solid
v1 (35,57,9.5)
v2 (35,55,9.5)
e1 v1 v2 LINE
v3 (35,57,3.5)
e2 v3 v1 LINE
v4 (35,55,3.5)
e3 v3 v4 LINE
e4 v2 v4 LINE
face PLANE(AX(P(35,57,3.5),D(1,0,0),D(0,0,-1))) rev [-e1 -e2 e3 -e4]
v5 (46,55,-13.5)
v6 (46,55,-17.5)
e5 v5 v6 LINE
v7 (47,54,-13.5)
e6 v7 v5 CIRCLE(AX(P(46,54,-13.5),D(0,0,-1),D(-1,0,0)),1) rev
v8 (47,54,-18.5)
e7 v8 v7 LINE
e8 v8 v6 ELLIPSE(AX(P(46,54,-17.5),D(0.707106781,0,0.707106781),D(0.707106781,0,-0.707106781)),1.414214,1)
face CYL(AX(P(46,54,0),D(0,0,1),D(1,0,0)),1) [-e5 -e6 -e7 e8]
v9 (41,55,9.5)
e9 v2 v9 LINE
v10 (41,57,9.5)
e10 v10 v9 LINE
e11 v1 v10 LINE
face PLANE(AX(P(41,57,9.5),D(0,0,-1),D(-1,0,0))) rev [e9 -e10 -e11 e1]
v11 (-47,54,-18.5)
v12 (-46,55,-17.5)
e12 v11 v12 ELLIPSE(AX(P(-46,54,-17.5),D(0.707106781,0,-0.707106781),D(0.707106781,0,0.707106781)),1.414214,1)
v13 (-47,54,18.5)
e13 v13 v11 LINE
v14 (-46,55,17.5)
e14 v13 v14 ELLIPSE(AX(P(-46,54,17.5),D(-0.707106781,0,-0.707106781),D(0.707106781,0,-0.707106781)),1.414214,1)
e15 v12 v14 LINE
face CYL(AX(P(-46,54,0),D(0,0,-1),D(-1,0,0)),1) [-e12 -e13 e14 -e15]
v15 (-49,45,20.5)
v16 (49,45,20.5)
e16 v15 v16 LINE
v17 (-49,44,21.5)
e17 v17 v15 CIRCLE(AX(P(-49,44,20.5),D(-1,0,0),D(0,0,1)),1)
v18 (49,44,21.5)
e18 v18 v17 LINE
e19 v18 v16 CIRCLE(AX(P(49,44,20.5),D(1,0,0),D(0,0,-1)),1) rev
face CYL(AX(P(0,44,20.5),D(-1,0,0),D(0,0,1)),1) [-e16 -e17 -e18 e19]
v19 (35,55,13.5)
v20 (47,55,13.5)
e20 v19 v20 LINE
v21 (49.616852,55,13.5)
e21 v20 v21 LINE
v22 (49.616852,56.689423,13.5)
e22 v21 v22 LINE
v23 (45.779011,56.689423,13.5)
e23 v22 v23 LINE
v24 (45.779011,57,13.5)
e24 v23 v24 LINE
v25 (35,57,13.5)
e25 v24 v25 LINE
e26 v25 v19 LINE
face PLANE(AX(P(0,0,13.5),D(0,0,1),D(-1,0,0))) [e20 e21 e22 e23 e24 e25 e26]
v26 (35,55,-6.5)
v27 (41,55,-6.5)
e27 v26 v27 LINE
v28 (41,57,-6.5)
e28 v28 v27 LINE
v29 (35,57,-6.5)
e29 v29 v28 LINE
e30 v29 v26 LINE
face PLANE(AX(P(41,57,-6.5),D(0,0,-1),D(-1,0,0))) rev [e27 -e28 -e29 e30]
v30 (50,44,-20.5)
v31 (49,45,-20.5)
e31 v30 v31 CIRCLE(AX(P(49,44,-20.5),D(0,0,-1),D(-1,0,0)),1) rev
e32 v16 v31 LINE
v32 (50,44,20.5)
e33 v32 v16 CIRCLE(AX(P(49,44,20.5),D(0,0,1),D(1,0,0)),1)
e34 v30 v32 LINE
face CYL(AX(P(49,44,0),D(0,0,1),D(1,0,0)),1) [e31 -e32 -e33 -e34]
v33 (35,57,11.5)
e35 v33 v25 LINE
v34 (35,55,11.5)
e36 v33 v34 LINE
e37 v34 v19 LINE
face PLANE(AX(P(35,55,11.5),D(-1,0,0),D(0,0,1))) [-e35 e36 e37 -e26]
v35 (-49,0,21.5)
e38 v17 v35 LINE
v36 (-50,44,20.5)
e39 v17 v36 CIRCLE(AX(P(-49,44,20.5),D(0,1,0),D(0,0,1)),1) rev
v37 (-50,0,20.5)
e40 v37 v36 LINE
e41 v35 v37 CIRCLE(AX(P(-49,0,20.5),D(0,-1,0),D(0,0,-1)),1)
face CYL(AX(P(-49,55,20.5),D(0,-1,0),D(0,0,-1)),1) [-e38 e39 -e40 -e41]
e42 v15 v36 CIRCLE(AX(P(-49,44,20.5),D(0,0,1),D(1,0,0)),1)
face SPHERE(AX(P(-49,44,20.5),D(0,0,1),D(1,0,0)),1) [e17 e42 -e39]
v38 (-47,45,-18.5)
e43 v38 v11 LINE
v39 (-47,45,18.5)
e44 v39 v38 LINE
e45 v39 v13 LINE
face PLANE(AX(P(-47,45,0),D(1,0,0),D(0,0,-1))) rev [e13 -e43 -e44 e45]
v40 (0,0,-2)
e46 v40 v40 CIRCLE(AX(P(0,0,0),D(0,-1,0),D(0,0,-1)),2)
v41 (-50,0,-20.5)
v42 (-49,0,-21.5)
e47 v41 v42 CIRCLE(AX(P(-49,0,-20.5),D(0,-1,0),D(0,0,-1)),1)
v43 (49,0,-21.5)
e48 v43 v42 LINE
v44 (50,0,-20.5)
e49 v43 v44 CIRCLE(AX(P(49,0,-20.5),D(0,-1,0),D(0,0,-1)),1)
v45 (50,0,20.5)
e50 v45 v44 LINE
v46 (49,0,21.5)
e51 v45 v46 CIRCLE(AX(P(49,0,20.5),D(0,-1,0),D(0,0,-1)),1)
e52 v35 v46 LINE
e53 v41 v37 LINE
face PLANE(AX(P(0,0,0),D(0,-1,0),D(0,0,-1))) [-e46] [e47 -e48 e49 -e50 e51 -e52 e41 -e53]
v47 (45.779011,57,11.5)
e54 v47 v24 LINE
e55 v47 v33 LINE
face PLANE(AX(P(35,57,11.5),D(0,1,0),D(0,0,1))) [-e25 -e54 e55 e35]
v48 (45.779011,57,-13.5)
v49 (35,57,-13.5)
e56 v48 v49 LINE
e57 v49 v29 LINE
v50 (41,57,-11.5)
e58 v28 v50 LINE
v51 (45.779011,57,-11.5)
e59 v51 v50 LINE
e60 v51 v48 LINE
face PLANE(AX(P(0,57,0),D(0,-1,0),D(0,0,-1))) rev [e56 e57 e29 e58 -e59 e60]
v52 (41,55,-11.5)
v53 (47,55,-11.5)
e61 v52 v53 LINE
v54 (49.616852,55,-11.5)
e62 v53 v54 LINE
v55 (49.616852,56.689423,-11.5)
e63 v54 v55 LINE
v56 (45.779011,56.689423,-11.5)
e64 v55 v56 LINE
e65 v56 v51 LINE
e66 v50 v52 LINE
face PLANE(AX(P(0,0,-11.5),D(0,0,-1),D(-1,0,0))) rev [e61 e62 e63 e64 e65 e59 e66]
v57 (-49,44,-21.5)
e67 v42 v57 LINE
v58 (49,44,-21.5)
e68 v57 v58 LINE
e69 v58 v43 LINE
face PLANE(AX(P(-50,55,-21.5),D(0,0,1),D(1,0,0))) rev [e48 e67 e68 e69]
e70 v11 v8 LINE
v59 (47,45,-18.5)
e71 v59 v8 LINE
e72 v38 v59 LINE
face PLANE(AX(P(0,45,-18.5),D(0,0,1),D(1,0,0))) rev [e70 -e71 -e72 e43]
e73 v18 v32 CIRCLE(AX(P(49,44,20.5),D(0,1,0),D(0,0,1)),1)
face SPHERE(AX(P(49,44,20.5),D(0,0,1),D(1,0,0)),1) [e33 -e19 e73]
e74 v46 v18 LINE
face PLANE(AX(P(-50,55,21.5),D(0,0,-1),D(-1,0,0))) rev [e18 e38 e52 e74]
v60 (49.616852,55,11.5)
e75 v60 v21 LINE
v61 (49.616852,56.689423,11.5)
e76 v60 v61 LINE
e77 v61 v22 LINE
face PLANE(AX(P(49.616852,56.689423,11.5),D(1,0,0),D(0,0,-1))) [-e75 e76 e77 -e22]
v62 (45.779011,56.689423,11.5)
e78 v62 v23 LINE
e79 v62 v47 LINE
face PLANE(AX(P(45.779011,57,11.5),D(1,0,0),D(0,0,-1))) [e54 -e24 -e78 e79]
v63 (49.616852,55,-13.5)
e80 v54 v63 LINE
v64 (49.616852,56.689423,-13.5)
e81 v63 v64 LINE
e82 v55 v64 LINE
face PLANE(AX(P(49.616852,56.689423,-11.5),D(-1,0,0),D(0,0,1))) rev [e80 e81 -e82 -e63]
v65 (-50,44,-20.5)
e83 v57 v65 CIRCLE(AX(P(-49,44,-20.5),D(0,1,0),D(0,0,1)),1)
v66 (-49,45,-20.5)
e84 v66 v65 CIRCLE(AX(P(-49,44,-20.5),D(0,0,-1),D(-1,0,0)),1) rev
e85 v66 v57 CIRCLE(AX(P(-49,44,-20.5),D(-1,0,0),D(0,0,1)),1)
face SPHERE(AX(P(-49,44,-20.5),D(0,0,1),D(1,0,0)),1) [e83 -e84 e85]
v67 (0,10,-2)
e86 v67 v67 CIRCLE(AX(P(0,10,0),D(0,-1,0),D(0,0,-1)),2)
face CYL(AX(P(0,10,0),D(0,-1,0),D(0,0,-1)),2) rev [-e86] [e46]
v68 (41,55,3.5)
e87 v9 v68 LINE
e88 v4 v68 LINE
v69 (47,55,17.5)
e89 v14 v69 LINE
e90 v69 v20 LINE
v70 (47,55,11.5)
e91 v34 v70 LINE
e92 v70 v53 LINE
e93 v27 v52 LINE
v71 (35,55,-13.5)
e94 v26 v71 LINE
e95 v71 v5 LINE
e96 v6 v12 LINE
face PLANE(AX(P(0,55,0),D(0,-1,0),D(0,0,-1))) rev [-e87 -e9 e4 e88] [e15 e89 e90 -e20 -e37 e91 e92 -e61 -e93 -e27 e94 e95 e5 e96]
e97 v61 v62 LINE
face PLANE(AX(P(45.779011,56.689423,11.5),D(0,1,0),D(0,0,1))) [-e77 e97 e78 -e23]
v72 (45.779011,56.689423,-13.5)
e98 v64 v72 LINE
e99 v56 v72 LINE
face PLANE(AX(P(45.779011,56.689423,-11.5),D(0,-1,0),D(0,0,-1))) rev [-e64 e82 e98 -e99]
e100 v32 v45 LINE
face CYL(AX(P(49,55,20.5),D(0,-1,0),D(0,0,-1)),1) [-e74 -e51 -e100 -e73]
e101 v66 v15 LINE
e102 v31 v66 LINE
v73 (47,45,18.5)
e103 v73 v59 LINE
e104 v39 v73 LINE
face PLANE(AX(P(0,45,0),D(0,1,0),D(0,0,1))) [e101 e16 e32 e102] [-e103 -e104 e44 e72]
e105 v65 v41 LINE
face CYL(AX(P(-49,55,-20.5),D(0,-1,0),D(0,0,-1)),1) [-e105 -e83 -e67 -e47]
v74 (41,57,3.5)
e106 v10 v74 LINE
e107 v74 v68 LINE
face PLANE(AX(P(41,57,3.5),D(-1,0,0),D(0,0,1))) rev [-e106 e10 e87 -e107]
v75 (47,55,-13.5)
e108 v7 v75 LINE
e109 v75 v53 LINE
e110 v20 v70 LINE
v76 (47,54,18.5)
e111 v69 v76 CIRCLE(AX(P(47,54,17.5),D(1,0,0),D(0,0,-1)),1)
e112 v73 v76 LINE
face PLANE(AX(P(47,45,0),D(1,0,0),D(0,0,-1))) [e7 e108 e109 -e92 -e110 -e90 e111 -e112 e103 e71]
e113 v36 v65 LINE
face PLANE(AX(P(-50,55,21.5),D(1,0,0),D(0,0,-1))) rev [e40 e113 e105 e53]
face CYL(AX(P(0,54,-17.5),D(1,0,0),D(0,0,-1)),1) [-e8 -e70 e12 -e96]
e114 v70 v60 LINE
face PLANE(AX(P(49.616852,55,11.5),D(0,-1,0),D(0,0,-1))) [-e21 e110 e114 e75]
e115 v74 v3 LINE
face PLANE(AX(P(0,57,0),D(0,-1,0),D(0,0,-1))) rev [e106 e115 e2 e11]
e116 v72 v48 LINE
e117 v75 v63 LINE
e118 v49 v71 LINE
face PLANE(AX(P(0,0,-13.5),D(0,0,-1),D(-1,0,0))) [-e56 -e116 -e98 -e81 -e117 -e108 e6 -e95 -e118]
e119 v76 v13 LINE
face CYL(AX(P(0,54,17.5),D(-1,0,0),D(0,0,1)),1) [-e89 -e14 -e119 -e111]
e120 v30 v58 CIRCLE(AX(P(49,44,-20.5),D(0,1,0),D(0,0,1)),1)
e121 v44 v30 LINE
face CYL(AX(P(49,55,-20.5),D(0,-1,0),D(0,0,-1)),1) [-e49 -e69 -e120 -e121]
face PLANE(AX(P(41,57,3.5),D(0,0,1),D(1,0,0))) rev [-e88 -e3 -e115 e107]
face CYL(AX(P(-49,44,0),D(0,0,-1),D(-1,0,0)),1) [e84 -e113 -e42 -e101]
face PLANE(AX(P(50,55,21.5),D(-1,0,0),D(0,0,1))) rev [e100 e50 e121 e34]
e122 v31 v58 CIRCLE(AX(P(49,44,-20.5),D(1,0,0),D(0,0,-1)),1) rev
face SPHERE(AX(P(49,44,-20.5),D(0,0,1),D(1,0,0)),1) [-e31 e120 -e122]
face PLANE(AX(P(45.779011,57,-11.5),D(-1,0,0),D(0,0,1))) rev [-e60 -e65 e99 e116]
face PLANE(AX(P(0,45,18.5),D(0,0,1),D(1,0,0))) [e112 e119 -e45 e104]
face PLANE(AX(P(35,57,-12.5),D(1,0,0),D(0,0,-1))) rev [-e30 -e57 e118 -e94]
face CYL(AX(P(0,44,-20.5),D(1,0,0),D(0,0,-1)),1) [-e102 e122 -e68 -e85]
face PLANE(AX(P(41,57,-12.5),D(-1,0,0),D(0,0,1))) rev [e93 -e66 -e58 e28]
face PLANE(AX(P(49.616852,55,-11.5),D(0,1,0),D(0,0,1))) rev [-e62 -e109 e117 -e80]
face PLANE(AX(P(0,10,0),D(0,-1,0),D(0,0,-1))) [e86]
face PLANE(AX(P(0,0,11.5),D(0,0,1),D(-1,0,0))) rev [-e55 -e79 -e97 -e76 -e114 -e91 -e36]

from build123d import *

# Parameters (mm, degrees)
SKETCH1_W           = 100
SKETCH1_H           = 43
BOSS_EXTRUDE1_DEPTH = 55
SKETCH2_W           = 100
SKETCH2_H           = 43
SKETCH2_W_2         = 94
SKETCH2_H_2         = 37
SKETCH2_W_3         = 6
SKETCH2_H_3         = 6
CUT_EXTRUDE1_DEPTH  = 10
SKETCH3_W           = 6
SKETCH3_H           = 6
BOSS_EXTRUDE2_DEPTH = 12
SKETCH7_R           = 2
CUT_EXTRUDE2_DEPTH  = 10
SKETCH4_W           = 6
SKETCH4_H           = 6
BOSS_EXTRUDE3_DEPTH = 12
BOSS_EXTRUDE4_DEPTH = 1
FILLET1_R           = 1


with BuildPart() as part:
    # Sketch1 → Boss-Extrude1 (new body)
    with BuildSketch(Plane(origin=(0, 0, 0), x_dir=(1, 0, 0), z_dir=(0, 1, 0))):
        Rectangle(SKETCH1_W, SKETCH1_H)
    extrude(amount=BOSS_EXTRUDE1_DEPTH)

    # Sketch2 → Cut-Extrude1 (cut)
    # profile 1 of 3: a face of its own
    with BuildSketch(Plane(origin=(0, 55, 0), x_dir=(1, 0, 0), z_dir=(0, 1, 0))):
        Rectangle(SKETCH2_W, SKETCH2_H)
        Rectangle(SKETCH2_W_2, SKETCH2_H_2, mode=Mode.SUBTRACT)
    # profile 2 of 3: a face of its own
    with BuildSketch(Plane(origin=(0, 55, 0), x_dir=(1, 0, 0), z_dir=(0, 1, 0))):
        with Locations((38, 9.5)):
            Rectangle(SKETCH2_W_3, SKETCH2_H_3)
    # profile 3 of 3: a face of its own
    with BuildSketch(Plane(origin=(0, 55, 0), x_dir=(1, 0, 0), z_dir=(0, 1, 0))):
        with Locations((38, -6.5)):
            Rectangle(SKETCH2_W_3, SKETCH2_H_3)
    extrude(amount=-CUT_EXTRUDE1_DEPTH, mode=Mode.SUBTRACT)

    # Sketch3 → Boss-Extrude2 (add)
    with BuildSketch(Plane(origin=(0, 45, 0), x_dir=(1, 0, 0), z_dir=(0, 1, 0))):
        with Locations((38, -6.5)):
            Rectangle(SKETCH3_W, SKETCH3_H)
    extrude(amount=BOSS_EXTRUDE2_DEPTH)

    # Sketch7 → Cut-Extrude2 (cut)
    with BuildSketch(Plane.XZ):
        with Locations(Location((0, 0, 0), (0, 0, 270))):
            Circle(SKETCH7_R)
    extrude(amount=-CUT_EXTRUDE2_DEPTH, mode=Mode.SUBTRACT)

    # Sketch4 → Boss-Extrude3 (add)
    with BuildSketch(Plane(origin=(0, 45, 0), x_dir=(1, 0, 0), z_dir=(0, 1, 0))):
        with Locations((38, 9.5)):
            Rectangle(SKETCH4_W, SKETCH4_H)
    extrude(amount=BOSS_EXTRUDE3_DEPTH)

    # Sketch5 → Boss-Extrude4 (add, symmetric)
    with BuildSketch(Plane.XY.offset(-12.5)):
        Polygon((35, 55), (35, 57), (45.779010746, 57), (45.779010746, 56.689423242), (49.616852111, 56.689423242), (49.616852111, 55), align=None)
    boss_extrude4 = extrude(amount=BOSS_EXTRUDE4_DEPTH, both=True)

    # Mirror1: Boss-Extrude4 across plane
    add(boss_extrude4.mirror(Plane.XY))

    # Fillet1
    # the kernel refuses this fillet: 1 mm, written as the material it takes off along each edge
    with BuildSketch(Plane(origin=(-49, 44, 20.5), x_dir=(0, 1, 0), z_dir=(0, 0, 1))) as fillet1_piece_1_section:
        Polygon((0, 0), (FILLET1_R * 1.02, 0), (FILLET1_R * 1.02, FILLET1_R * 1.02), (0, FILLET1_R * 1.02), align=None)
    fillet1_piece_1 = extrude(amount=FILLET1_R * 1.02, mode=Mode.PRIVATE)
    fillet1_piece_1 = fillet1_piece_1 - Plane(origin=(-49, 44, 20.5), x_dir=(0.7071067811865475, -0.7071067811865475, 0), z_dir=(0, 0, 1)) * Sphere(FILLET1_R, mode=Mode.PRIVATE)
    add(fillet1_piece_1, mode=Mode.SUBTRACT)
    with BuildSketch(Plane(origin=(49, 44, 20.5), x_dir=(1, 0, 0), z_dir=(0, 0, 1))) as fillet1_piece_2_section:
        Polygon((0, 0), (FILLET1_R * 1.02, 0), (FILLET1_R * 1.02, FILLET1_R * 1.02), (0, FILLET1_R * 1.02), align=None)
    fillet1_piece_2 = extrude(amount=FILLET1_R * 1.02, mode=Mode.PRIVATE)
    fillet1_piece_2 = fillet1_piece_2 - Plane(origin=(49, 44, 20.5), x_dir=(-0.7071067811865475, -0.7071067811865475, 0), z_dir=(0, 0, 1)) * Sphere(FILLET1_R, mode=Mode.PRIVATE)
    add(fillet1_piece_2, mode=Mode.SUBTRACT)
    with BuildSketch(Plane(origin=(49, 44, -20.5), x_dir=(0, 1, 0), z_dir=(1, 0, 0))) as fillet1_piece_3_section:
        Polygon((0, 0), (FILLET1_R * 1.02, 0), (FILLET1_R * 1.02, -FILLET1_R * 1.02), (0, -FILLET1_R * 1.02), align=None)
    fillet1_piece_3 = extrude(amount=FILLET1_R * 1.02, mode=Mode.PRIVATE)
    fillet1_piece_3 = fillet1_piece_3 - Plane(origin=(49, 44, -20.5), x_dir=(0, -0.7071067811865475, 0.7071067811865475), z_dir=(1, 0, 0)) * Sphere(FILLET1_R, mode=Mode.PRIVATE)
    add(fillet1_piece_3, mode=Mode.SUBTRACT)
    with BuildSketch(Plane(origin=(-49, 44, -20.5), x_dir=(-1, 0, 0), z_dir=(0, 1, 0))) as fillet1_piece_4_section:
        Polygon((0, 0), (FILLET1_R * 1.02, 0), (FILLET1_R * 1.02, -FILLET1_R * 1.02), (0, -FILLET1_R * 1.02), align=None)
    fillet1_piece_4 = extrude(amount=FILLET1_R * 1.02, mode=Mode.PRIVATE)
    fillet1_piece_4 = fillet1_piece_4 - Plane(origin=(-49, 44, -20.5), x_dir=(0.7071067811865475, 0, 0.7071067811865475), z_dir=(0, 1, 0)) * Sphere(FILLET1_R, mode=Mode.PRIVATE)
    add(fillet1_piece_4, mode=Mode.SUBTRACT)
    with BuildSketch(Plane(origin=(-50, -2.5, 21.5), x_dir=(1, 0, 0), z_dir=(0, 1, 0)), Plane(origin=(-50, -2.5, -21.5), x_dir=(0, 0, 1), z_dir=(0, 1, 0))) as fillet1_piece_5:
        with BuildLine():
            CenterArc((FILLET1_R, FILLET1_R), FILLET1_R, 180, 90)
            Line((0, FILLET1_R), (0, 0))
            Line((0, 0), (FILLET1_R, 0))
        make_face()
    extrude(amount=46.5, mode=Mode.SUBTRACT)
    with BuildSketch(Plane(origin=(50, -2.5, 21.5), x_dir=(-1, 0, 0), z_dir=(0, 1, 0)), Plane(origin=(50, -2.5, -21.5), x_dir=(0, 0, 1), z_dir=(0, 1, 0))) as fillet1_piece_6:
        with BuildLine():
            CenterArc((FILLET1_R, -FILLET1_R), FILLET1_R, 90, 90)
            Line((0, -FILLET1_R), (0, 0))
            Line((0, 0), (FILLET1_R, 0))
        make_face()
    extrude(amount=46.5, mode=Mode.SUBTRACT)
    with BuildSketch(Plane(origin=(49, 45, -21.5), x_dir=(0, 0, 1), z_dir=(-1, 0, 0))) as fillet1_piece_7:
        with BuildLine():
            CenterArc((FILLET1_R, -FILLET1_R), FILLET1_R, 90, 90)
            Line((0, -FILLET1_R), (0, 0))
            Line((0, 0), (FILLET1_R, 0))
        make_face()
    extrude(amount=98, mode=Mode.SUBTRACT)
    with BuildSketch(Plane(origin=(-50, 45, -20.5), x_dir=(1, 0, 0), z_dir=(0, 0, 1))) as fillet1_piece_8:
        with BuildLine():
            CenterArc((FILLET1_R, -FILLET1_R), FILLET1_R, 90, 90)
            Line((0, -FILLET1_R), (0, 0))
            Line((0, 0), (FILLET1_R, 0))
        make_face()
    extrude(amount=41, mode=Mode.SUBTRACT)
    with BuildSketch(Plane(origin=(-49, 45, 21.5), x_dir=(0, -1, 0), z_dir=(1, 0, 0))) as fillet1_piece_9:
        with BuildLine():
            CenterArc((FILLET1_R, FILLET1_R), FILLET1_R, 180, 90)
            Line((0, FILLET1_R), (0, 0))
            Line((0, 0), (FILLET1_R, 0))
        make_face()
    extrude(amount=98, mode=Mode.SUBTRACT)
    with BuildSketch(Plane(origin=(50, 45, 20.5), x_dir=(0, -1, 0), z_dir=(0, 0, -1))) as fillet1_piece_10:
        with BuildLine():
            CenterArc((FILLET1_R, FILLET1_R), FILLET1_R, 180, 90)
            Line((0, FILLET1_R), (0, 0))
            Line((0, 0), (FILLET1_R, 0))
        make_face()
    extrude(amount=41, mode=Mode.SUBTRACT)
    with BuildSketch(Plane(origin=(47, 55, -13.5), x_dir=(0, -1, 0), z_dir=(0, 0, -1))) as fillet1_piece_11:
        with BuildLine():
            CenterArc((FILLET1_R, FILLET1_R), FILLET1_R, 180, 90)
            Line((0, FILLET1_R), (0, 0))
            Line((0, 0), (FILLET1_R, 0))
        make_face()
    extrude(amount=7.5, mode=Mode.SUBTRACT)
    with BuildSketch(Plane(origin=(-49.5, 55, 18.5), x_dir=(0, -1, 0), z_dir=(1, 0, 0)), Plane(origin=(49.5, 55, -18.5), x_dir=(0, -1, 0), z_dir=(-1, 0, 0))) as fillet1_piece_12:
        with BuildLine():
            CenterArc((FILLET1_R, FILLET1_R), FILLET1_R, 180, 90)
            Line((0, FILLET1_R), (0, 0))
            Line((0, 0), (FILLET1_R, 0))
        make_face()
    extrude(amount=99, mode=Mode.SUBTRACT)
    with BuildSketch(Plane(origin=(-47, 55, -21), x_dir=(0, -1, 0), z_dir=(0, 0, 1))) as fillet1_piece_13:
        with BuildLine():
            CenterArc((FILLET1_R, FILLET1_R), FILLET1_R, 180, 90)
            Line((0, FILLET1_R), (0, 0))
            Line((0, 0), (FILLET1_R, 0))
        make_face()
    extrude(amount=42, mode=Mode.SUBTRACT)


solid = part.part
